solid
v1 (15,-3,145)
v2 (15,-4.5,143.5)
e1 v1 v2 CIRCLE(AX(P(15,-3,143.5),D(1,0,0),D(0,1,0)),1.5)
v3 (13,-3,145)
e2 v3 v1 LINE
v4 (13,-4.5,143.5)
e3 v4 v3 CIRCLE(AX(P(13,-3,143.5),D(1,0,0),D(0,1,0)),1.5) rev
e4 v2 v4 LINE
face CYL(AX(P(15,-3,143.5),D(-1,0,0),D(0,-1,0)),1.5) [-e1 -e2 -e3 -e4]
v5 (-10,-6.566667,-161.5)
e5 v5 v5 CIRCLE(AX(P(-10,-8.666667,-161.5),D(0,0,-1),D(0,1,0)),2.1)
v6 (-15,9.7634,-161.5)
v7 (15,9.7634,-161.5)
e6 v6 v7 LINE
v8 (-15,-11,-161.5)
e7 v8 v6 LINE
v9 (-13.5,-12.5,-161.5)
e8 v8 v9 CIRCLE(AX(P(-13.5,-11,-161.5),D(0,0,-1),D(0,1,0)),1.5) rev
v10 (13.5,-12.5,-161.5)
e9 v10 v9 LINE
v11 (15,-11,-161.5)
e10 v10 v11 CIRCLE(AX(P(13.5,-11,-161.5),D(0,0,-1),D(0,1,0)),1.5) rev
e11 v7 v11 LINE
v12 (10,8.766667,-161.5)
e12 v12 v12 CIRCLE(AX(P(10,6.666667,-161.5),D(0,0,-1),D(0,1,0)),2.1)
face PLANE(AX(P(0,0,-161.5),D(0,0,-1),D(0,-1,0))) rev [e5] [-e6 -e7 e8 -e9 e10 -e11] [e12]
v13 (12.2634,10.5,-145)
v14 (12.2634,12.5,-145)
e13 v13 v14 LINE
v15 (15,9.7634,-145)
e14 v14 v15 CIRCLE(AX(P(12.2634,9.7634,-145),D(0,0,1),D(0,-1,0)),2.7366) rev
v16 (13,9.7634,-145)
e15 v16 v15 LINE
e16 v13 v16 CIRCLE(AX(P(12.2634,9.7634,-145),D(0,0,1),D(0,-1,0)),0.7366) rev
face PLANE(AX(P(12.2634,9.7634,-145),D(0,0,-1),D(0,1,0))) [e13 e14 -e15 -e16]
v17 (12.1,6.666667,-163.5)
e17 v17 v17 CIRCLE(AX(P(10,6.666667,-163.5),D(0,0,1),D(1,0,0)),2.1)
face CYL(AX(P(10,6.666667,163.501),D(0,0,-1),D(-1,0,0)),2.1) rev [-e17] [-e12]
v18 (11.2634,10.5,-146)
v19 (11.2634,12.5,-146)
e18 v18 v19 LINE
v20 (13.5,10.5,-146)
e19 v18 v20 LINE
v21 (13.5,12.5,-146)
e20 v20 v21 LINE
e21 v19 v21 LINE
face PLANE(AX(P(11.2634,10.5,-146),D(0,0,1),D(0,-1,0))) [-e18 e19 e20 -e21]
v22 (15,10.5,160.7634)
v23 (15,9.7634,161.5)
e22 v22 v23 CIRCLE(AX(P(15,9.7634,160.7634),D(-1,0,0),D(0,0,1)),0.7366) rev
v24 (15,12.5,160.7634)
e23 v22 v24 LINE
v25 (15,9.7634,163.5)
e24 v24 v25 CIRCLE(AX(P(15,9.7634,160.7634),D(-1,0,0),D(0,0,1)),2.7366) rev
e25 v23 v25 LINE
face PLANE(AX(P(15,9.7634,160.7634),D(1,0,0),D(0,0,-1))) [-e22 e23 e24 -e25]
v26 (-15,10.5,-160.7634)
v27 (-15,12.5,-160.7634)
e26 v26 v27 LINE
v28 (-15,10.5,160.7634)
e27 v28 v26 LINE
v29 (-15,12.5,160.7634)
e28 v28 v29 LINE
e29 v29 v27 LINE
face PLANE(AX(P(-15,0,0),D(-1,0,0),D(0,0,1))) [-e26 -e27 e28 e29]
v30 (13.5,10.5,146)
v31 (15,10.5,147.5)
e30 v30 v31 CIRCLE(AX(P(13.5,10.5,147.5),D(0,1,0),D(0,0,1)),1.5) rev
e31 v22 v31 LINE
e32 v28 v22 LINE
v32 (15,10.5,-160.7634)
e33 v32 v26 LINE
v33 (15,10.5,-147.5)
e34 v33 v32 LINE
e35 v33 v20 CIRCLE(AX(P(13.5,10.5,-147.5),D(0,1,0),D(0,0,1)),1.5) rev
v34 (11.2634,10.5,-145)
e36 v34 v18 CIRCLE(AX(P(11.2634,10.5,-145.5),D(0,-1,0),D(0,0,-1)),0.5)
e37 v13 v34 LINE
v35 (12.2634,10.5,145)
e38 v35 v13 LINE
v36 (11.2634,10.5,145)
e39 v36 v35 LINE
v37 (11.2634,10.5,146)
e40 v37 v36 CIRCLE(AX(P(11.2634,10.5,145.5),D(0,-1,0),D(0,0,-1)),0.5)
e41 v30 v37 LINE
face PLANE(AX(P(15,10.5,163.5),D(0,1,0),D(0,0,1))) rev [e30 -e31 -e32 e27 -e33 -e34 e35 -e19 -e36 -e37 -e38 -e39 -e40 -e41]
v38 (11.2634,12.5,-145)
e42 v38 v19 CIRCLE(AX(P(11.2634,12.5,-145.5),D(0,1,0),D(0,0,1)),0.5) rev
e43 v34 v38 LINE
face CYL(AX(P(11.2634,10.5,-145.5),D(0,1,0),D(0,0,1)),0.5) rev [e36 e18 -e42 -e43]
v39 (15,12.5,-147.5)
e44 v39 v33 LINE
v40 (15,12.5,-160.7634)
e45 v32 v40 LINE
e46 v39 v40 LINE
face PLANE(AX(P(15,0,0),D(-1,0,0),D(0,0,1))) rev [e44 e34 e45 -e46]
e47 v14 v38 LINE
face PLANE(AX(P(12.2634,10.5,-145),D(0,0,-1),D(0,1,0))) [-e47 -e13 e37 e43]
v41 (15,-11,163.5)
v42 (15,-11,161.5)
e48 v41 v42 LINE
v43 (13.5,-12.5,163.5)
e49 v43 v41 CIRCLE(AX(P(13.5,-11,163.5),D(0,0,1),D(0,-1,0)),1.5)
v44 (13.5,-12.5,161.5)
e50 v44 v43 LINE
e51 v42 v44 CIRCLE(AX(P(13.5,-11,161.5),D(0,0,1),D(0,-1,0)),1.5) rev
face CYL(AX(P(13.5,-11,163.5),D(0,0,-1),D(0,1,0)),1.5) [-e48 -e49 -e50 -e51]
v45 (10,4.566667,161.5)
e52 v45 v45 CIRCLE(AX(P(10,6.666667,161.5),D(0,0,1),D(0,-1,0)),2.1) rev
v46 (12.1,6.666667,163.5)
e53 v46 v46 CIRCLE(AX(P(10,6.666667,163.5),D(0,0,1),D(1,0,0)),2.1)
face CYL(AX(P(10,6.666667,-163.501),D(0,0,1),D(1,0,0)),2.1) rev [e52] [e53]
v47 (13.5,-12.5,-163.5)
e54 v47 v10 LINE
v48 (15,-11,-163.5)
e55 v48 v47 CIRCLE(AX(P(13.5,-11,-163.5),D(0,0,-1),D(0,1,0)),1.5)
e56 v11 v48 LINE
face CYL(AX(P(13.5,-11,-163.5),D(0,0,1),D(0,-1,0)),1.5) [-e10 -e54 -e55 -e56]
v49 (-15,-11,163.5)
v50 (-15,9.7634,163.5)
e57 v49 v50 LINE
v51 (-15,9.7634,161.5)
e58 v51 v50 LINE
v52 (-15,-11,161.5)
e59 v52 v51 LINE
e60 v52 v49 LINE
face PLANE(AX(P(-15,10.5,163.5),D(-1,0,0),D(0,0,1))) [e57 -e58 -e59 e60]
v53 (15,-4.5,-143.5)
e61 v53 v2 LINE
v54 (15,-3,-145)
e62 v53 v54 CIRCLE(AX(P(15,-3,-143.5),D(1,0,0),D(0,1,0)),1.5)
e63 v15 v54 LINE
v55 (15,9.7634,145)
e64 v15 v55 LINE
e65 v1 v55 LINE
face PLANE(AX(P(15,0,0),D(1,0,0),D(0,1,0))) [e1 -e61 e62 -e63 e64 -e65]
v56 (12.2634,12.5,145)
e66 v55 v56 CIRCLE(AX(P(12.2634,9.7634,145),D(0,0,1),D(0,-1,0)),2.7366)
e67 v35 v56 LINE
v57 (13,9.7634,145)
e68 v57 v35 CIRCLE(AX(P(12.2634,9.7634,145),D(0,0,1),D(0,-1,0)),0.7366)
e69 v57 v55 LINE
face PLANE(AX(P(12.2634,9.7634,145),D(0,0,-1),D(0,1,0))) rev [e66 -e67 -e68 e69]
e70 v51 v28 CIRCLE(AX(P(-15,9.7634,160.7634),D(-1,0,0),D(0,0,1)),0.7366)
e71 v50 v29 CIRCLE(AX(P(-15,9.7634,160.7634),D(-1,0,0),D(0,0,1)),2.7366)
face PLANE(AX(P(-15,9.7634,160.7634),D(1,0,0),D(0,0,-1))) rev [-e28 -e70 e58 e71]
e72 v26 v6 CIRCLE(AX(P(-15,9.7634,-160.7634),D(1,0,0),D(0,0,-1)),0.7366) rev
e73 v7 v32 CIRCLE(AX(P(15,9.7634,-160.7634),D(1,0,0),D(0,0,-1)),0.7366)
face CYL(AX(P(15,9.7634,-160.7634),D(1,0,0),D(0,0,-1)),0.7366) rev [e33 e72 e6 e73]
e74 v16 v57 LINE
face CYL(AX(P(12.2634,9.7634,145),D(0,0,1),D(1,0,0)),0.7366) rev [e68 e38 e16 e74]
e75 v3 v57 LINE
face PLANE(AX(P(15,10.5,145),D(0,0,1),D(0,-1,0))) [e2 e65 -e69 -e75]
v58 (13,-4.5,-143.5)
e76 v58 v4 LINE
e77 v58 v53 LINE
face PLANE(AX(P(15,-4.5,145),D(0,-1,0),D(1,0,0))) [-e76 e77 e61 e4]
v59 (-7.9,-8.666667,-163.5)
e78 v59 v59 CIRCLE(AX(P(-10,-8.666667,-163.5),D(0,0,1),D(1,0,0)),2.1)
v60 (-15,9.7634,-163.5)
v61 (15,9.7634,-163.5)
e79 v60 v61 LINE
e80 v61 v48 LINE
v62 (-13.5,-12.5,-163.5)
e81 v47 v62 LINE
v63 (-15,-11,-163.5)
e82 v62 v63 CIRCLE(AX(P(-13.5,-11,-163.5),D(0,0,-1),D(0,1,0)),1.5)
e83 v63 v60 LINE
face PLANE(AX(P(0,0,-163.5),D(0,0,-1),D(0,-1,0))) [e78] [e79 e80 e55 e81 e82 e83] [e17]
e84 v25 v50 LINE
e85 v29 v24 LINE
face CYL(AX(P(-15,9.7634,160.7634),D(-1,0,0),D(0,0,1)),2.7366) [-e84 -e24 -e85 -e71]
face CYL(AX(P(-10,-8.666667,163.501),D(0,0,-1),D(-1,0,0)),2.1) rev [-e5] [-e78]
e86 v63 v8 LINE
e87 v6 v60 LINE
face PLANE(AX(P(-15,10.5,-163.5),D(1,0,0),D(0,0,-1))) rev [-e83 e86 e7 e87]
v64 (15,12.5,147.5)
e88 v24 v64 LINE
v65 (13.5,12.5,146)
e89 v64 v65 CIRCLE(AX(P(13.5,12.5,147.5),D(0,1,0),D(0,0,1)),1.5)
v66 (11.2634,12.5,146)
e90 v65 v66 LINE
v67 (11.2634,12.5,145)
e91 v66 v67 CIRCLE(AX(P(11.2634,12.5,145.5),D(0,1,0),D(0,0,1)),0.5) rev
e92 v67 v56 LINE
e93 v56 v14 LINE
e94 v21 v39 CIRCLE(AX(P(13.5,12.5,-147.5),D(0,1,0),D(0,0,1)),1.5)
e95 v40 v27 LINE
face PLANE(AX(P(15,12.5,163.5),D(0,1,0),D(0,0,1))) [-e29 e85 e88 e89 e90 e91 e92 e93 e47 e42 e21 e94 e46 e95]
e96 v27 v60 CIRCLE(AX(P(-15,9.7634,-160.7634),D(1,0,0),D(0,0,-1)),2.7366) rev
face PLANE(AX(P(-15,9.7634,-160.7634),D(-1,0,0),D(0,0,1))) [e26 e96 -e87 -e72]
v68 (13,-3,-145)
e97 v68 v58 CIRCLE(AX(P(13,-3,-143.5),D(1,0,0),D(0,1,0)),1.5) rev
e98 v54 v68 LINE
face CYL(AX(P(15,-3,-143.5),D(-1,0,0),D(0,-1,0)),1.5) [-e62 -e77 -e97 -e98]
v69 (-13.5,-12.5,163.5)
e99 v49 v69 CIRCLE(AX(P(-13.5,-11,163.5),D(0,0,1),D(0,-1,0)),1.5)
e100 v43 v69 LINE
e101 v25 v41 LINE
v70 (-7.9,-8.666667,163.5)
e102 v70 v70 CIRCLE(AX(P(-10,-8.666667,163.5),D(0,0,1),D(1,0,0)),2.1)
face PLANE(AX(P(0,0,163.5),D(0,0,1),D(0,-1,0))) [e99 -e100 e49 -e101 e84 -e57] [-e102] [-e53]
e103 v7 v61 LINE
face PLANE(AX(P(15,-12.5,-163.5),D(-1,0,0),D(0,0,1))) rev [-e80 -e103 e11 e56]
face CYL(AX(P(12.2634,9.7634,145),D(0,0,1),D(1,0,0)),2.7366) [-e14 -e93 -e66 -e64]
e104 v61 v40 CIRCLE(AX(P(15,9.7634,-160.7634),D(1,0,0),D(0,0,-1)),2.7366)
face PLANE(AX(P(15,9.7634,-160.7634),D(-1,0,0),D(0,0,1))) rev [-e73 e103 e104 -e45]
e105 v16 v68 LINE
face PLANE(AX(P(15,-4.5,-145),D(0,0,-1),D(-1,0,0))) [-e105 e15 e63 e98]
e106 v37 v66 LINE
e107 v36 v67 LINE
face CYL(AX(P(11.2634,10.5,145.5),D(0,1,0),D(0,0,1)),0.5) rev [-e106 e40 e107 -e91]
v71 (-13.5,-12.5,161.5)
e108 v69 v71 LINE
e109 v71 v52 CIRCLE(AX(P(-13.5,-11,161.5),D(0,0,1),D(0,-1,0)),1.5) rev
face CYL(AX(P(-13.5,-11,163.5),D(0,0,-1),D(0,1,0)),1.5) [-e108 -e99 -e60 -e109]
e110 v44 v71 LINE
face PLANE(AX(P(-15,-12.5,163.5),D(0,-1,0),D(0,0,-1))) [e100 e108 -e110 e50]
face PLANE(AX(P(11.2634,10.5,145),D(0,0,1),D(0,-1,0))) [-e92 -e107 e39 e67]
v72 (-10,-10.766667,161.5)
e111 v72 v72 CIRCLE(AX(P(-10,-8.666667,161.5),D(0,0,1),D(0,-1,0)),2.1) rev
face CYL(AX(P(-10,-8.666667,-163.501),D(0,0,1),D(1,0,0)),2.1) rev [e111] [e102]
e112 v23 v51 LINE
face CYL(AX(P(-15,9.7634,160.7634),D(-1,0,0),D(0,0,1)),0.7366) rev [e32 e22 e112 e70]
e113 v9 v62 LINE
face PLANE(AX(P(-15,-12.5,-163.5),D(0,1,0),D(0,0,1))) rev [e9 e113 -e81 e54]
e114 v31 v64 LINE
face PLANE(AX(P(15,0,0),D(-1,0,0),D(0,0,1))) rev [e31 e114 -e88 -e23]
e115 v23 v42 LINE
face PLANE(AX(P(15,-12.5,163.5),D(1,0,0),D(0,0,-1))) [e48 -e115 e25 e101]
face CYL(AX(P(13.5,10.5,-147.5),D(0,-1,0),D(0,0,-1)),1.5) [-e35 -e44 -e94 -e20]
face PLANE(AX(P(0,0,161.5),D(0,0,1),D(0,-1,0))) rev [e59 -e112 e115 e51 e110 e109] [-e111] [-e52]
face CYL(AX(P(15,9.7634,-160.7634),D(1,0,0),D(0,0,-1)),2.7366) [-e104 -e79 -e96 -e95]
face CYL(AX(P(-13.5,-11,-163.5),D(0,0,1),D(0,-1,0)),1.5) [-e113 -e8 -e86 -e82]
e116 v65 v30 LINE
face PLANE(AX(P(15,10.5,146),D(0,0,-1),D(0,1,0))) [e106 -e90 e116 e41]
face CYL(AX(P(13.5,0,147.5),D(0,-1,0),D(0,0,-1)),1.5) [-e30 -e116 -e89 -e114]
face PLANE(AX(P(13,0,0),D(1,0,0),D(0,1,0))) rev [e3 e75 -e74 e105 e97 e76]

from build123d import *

# Parameters (mm, degrees)
SKETCH1_W                    = 327
SKETCH1_H                    = 2
BASE_FLANGE1_DEPTH           = 15
EDGE_FLANGE1_STRIP_W         = 9.4732
EDGE_FLANGE1_STRIP_H         = 2
EDGE_FLANGE1_STRIP_CUT_DEPTH = 30
EDGE_FLANGE1_DEPTH           = 30
CUT_EXTRUDE1_REACH           = 329.582
SKETCH9_R                    = 2.1
EDGE_FLANGE2_START           = 9.7634
EDGE_FLANGE2_DEPTH           = 3.2366
EDGE_FLANGE2_START_2         = -4.5
EDGE_FLANGE2_2_OUTLINE_W     = 2
EDGE_FLANGE2_2_OUTLINE_H     = 290
EDGE_FLANGE2_2_DEPTH         = 14.2634
EDGE_FLANGE2_START_3         = -145
EDGE_FLANGE2_3_DEPTH         = 290
EDGE_FLANGE2_4_DEPTH         = 290
FILLET1_R                    = 1.5


with BuildPart() as part:
    # Base-Flange1: sheet metal written as solids
    # Sketch1 → Base-Flange1 (new, symmetric)
    with BuildSketch(Plane(origin=(0, 0, 0), x_dir=(0, 0, -1), z_dir=(1, 0, 0))):
        with Locations((0, 11.5)):
            Rectangle(SKETCH1_W, SKETCH1_H)
    extrude(amount=BASE_FLANGE1_DEPTH, both=True)

    # Edge-Flange1: sheet metal written as solids
    # Edge-Flange1 strip (on a plane across the edge) → Edge-Flange1 strip cut (cut)
    with BuildSketch(Plane(origin=(15, 10.5, 163.5), x_dir=(0, 0, -1), z_dir=(-1, 0, 0))):
        with Locations((-2, -1)):
            Rectangle(EDGE_FLANGE1_STRIP_W, EDGE_FLANGE1_STRIP_H)
    edge_flange1_strip_cut = extrude(amount=EDGE_FLANGE1_STRIP_CUT_DEPTH, mode=Mode.SUBTRACT)

    # Edge-Flange1 section (on a plane across the edge) → Edge-Flange1 (add)
    with BuildSketch(Plane(origin=(15, 10.5, 163.5), x_dir=(0, 0, -1), z_dir=(-1, 0, 0))):
        with BuildLine():
            Line((0, 0.7366), (0, 23))
            Line((0, 23), (2, 23))
            Line((2, 23), (2, 0.7366))
            ThreePointArc((2, 0.7366), (2.215745145, 0.215745145), (2.7366, 0))
            Line((2.7366, 0), (2.7366, -2))
            ThreePointArc((2.7366, -2), (0.801531583, -1.198468417), (0, 0.7366))
        make_face()
    edge_flange1 = extrude(amount=EDGE_FLANGE1_DEPTH)

    # Mirror1: Edge-Flange1 strip cut, Edge-Flange1 across plane
    add(edge_flange1_strip_cut.mirror(Plane.XY), mode=Mode.SUBTRACT)
    add(edge_flange1.mirror(Plane.XY))

    # Sketch9 → Cut-Extrude1 (cut, up to next)
    with BuildSketch(Plane.XY.offset(163.5), mode=Mode.PRIVATE) as cut_extrude1_sk1:
        with Locations((10, 6.666666667)):
            Circle(SKETCH9_R)
    cut_extrude1_tool1 = extrude(cut_extrude1_sk1.sketch, amount=-CUT_EXTRUDE1_REACH, mode=Mode.PRIVATE) & part.part
    # Sketch9 → Cut-Extrude1 (cut, up to next)
    with BuildSketch(Plane.XY.offset(163.5), mode=Mode.PRIVATE) as cut_extrude1_sk2:
        with Locations((-10, -8.666666667)):
            Circle(SKETCH9_R)
    cut_extrude1_tool2 = extrude(cut_extrude1_sk2.sketch, amount=-CUT_EXTRUDE1_REACH, mode=Mode.PRIVATE) & part.part
    cut_extrude1_1 = cut_extrude1_tool1.solids().sort_by_distance((10, 6.666667, 163.5))[0]
    add(cut_extrude1_1, mode=Mode.SUBTRACT)
    cut_extrude1_2 = cut_extrude1_tool2.solids().sort_by_distance((-10, -8.666667, 163.5))[0]
    add(cut_extrude1_2, mode=Mode.SUBTRACT)
    cut_extrude1 = cut_extrude1_1 + cut_extrude1_2  # Cut-Extrude1 as one shape, for the pattern or mirror that repeats it

    # Mirror2: Cut-Extrude1 across plane
    add(cut_extrude1.mirror(Plane.XY), mode=Mode.SUBTRACT)

    # Edge-Flange2: read off the stored shape, not the designer's step
    # Edge-Flange2 outline → Edge-Flange2 (cut)
    with BuildSketch(Plane(origin=(0, 0, 0), x_dir=(1, 0, 0), z_dir=(0, 1, 0)).offset(EDGE_FLANGE2_START)):
        with BuildLine():
            Line((15, -146), (15, -145))
            Line((15, -145), (11.2634, -145))
            ThreePointArc((11.2634, -145), (10.7634, -145.5), (11.2634, -146))
            Line((11.2634, -146), (15, -146))
        make_face()
        with BuildLine():
            Line((11.2634, 145), (15, 145))
            Line((15, 145), (15, 146))
            Line((15, 146), (11.2634, 146))
            ThreePointArc((11.2634, 146), (10.7634, 145.5), (11.2634, 145))
        make_face()
    extrude(amount=EDGE_FLANGE2_DEPTH, mode=Mode.SUBTRACT)

    # Edge-Flange2 3 outline → Edge-Flange2 3 (cut)
    with BuildSketch(Plane.XY.offset(EDGE_FLANGE2_START_3)):
        with BuildLine():
            ThreePointArc((12.2634, 12.5), (13.917667209, 11.943395312), (14.899002398, 10.5))
            Line((14.899002398, 10.5), (15, 10.5))
            Line((15, 10.5), (15, 12.5))
            Line((15, 12.5), (12.2634, 12.5))
        make_face()
    extrude(amount=EDGE_FLANGE2_3_DEPTH, mode=Mode.SUBTRACT)



with BuildPart() as body_2:
    # Edge-Flange2 2 outline → Edge-Flange2 2 (new body)
    with BuildSketch(Plane(origin=(0, 0, 0), x_dir=(1, 0, 0), z_dir=(0, 1, 0)).offset(EDGE_FLANGE2_START_2)):
        with Locations((14, 0)):
            Rectangle(EDGE_FLANGE2_2_OUTLINE_W, EDGE_FLANGE2_2_OUTLINE_H)
    extrude(amount=EDGE_FLANGE2_2_DEPTH)


with BuildPart() as part_1:
    add(part.part)

    add(body_2.part)  # Edge-Flange2 4 merges body 2
    # Edge-Flange2 4 outline → Edge-Flange2 4 (add)
    with BuildSketch(Plane.XY.offset(EDGE_FLANGE2_START_3)):
        with BuildLine():
            Line((13, 9.7634), (15, 9.7634))
            ThreePointArc((15, 9.7634), (14.974633029, 10.135145906), (14.899002398, 10.5))
            Line((14.899002398, 10.5), (12.2634, 10.5))
            ThreePointArc((12.2634, 10.5), (12.784254855, 10.284254855), (13, 9.7634))
        make_face()
    extrude(amount=EDGE_FLANGE2_4_DEPTH)

    # Fillet1
    fillet1_edges = [part_1.edges().sort_by_distance(p)[0] for p in [
        (15, 11.5, 146),
        (15, 11.5, -146),
        (14, -4.5, -145),
        (14, -4.5, 145),
        (15, -12.5, 162.5),
        (-15, -12.5, 162.5),
        (-15, -12.5, -162.5),
        (15, -12.5, -162.5),
    ]]
    fillet(fillet1_edges, radius=FILLET1_R)


solid = part_1.part
